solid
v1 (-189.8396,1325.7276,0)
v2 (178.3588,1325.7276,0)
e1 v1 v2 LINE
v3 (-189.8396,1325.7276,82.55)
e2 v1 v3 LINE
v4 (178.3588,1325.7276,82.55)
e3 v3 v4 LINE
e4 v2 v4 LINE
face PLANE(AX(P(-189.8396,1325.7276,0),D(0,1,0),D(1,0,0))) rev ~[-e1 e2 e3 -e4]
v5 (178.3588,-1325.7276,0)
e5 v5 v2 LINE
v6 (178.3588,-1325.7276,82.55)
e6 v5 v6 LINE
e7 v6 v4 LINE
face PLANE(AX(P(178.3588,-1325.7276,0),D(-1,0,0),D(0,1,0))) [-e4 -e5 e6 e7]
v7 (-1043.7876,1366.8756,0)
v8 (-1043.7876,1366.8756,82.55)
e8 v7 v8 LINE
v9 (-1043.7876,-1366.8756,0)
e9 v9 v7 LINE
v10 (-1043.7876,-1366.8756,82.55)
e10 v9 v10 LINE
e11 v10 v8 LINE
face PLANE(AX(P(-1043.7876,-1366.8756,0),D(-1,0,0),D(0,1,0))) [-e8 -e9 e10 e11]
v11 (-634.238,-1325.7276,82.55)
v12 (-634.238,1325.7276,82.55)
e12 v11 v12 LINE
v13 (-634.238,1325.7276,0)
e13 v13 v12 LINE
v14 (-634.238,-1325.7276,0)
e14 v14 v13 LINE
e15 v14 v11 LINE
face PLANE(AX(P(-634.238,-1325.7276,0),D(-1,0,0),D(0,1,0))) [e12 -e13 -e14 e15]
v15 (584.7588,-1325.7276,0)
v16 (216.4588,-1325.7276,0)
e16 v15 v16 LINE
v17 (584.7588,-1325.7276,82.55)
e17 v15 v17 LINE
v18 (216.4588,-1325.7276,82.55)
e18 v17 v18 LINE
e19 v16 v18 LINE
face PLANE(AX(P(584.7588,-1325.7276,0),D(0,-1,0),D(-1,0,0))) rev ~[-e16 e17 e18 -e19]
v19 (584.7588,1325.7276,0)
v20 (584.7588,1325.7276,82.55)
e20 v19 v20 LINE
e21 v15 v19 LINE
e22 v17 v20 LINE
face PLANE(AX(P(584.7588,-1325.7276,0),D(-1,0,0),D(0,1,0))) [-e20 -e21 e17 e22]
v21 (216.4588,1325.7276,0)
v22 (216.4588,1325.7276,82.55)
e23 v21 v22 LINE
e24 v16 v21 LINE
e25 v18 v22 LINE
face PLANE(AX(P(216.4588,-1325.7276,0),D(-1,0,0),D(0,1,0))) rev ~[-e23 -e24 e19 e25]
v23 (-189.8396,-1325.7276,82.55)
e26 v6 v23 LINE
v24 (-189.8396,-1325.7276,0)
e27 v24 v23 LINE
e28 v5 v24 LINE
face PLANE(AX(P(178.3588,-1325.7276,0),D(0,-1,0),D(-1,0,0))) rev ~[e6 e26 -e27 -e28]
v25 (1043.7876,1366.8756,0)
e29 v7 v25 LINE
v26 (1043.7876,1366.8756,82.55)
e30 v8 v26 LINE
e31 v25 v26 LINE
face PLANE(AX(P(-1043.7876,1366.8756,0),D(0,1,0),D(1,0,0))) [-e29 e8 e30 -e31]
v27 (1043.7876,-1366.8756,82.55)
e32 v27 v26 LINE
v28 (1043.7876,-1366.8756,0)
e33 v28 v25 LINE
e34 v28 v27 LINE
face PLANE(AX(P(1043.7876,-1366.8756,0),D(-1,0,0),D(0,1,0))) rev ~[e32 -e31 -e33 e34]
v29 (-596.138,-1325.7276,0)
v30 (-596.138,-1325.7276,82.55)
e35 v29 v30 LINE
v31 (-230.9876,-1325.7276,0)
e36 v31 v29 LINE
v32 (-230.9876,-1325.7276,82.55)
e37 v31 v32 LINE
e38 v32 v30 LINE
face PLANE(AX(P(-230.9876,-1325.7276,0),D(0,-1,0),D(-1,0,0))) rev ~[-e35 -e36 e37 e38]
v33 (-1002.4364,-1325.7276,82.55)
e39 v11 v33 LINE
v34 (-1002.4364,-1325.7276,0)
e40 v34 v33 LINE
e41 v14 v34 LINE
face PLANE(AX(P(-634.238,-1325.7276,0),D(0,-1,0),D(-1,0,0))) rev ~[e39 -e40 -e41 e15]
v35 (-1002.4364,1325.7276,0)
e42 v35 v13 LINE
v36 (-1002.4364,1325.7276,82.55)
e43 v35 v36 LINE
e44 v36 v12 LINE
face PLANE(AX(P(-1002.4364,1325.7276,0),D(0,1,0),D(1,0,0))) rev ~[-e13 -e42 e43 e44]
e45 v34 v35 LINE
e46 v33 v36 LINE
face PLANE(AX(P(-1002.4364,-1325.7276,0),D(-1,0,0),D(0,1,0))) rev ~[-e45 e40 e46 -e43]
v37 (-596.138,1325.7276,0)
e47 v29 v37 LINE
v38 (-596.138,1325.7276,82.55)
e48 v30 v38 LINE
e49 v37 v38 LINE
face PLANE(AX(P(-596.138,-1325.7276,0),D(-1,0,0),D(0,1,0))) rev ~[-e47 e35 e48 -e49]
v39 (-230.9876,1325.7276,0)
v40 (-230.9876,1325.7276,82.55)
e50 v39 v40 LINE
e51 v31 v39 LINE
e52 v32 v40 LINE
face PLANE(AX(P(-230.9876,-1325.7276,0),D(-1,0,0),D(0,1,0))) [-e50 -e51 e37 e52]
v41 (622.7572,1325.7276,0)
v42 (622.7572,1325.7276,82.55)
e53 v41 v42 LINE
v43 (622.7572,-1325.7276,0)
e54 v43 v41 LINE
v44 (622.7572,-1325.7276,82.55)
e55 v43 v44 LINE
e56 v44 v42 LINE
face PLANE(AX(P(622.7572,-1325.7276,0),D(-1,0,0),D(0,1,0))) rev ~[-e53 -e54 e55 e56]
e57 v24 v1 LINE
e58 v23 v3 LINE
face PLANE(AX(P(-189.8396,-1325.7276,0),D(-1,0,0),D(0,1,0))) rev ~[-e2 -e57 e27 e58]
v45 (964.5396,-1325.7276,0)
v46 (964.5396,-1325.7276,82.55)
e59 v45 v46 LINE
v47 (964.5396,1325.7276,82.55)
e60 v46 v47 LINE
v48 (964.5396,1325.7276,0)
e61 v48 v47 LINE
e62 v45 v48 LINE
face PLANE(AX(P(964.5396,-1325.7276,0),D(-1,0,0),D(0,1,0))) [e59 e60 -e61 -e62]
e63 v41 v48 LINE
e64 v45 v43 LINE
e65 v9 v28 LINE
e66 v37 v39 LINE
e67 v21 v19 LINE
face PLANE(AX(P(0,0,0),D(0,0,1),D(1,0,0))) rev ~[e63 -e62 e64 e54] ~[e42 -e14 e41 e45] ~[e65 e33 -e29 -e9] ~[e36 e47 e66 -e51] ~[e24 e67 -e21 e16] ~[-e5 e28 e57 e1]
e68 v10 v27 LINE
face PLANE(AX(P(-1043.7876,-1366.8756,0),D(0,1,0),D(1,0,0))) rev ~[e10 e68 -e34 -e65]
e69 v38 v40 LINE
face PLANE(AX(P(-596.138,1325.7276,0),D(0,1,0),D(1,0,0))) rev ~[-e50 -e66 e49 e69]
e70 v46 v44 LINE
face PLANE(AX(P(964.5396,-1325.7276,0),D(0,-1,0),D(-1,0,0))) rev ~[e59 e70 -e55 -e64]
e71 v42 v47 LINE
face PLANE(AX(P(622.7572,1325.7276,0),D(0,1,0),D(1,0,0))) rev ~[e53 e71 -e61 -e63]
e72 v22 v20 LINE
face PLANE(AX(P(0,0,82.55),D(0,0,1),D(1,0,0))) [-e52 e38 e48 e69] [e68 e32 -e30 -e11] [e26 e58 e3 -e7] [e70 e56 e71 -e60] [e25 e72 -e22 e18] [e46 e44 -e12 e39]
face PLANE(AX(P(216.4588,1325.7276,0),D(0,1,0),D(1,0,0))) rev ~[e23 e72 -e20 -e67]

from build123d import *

# Parameters (mm, degrees)
F0_W     = 2087.5752
F0_H     = 2733.7512
F0_W_2   = 38.1
F0_H_2   = 2651.4552
F0_W_3   = 37.9984
F0_W_4   = 41.148
F1_DEPTH = 82.55


# Not quite as in the source:
# - a feature names something its author has since deleted; it is built from what else it names


with BuildPart() as f1:
    # F0 (on Top) → F1 (new body)
    with BuildSketch(Plane.XY):
        Rectangle(F0_W, F0_H)
        Polygon((1002.6396, 1325.7276), (1002.6396, -1325.7276), (964.5396, -1325.7276), (622.7572, -1325.7276), (584.7588, -1325.7276), (216.4588, -1325.7276), (178.3588, -1325.7276), (-189.8396, -1325.7276), (-230.9876, -1325.7276), (-596.138, -1325.7276), (-634.238, -1325.7276), (-1002.4364, -1325.7276), (-1002.4364, 1325.7276), (-634.238, 1325.7276), (-596.138, 1325.7276), (-230.9876, 1325.7276), (-189.8396, 1325.7276), (178.3588, 1325.7276), (216.4588, 1325.7276), (584.7588, 1325.7276), (622.7572, 1325.7276), (964.5396, 1325.7276), align=None, mode=Mode.SUBTRACT)
        with Locations((983.5896, 0)):
            Rectangle(F0_W_2, F0_H_2)
        with Locations((603.758, 0)):
            Rectangle(F0_W_3, F0_H_2)
        with Locations((197.4088, 0)):
            Rectangle(F0_W_2, F0_H_2)
        with Locations((-210.4136, 0)):
            Rectangle(F0_W_4, F0_H_2)
        with Locations((-615.188, 0)):
            Rectangle(F0_W_2, F0_H_2)
    extrude(amount=F1_DEPTH)


solid = f1.part
